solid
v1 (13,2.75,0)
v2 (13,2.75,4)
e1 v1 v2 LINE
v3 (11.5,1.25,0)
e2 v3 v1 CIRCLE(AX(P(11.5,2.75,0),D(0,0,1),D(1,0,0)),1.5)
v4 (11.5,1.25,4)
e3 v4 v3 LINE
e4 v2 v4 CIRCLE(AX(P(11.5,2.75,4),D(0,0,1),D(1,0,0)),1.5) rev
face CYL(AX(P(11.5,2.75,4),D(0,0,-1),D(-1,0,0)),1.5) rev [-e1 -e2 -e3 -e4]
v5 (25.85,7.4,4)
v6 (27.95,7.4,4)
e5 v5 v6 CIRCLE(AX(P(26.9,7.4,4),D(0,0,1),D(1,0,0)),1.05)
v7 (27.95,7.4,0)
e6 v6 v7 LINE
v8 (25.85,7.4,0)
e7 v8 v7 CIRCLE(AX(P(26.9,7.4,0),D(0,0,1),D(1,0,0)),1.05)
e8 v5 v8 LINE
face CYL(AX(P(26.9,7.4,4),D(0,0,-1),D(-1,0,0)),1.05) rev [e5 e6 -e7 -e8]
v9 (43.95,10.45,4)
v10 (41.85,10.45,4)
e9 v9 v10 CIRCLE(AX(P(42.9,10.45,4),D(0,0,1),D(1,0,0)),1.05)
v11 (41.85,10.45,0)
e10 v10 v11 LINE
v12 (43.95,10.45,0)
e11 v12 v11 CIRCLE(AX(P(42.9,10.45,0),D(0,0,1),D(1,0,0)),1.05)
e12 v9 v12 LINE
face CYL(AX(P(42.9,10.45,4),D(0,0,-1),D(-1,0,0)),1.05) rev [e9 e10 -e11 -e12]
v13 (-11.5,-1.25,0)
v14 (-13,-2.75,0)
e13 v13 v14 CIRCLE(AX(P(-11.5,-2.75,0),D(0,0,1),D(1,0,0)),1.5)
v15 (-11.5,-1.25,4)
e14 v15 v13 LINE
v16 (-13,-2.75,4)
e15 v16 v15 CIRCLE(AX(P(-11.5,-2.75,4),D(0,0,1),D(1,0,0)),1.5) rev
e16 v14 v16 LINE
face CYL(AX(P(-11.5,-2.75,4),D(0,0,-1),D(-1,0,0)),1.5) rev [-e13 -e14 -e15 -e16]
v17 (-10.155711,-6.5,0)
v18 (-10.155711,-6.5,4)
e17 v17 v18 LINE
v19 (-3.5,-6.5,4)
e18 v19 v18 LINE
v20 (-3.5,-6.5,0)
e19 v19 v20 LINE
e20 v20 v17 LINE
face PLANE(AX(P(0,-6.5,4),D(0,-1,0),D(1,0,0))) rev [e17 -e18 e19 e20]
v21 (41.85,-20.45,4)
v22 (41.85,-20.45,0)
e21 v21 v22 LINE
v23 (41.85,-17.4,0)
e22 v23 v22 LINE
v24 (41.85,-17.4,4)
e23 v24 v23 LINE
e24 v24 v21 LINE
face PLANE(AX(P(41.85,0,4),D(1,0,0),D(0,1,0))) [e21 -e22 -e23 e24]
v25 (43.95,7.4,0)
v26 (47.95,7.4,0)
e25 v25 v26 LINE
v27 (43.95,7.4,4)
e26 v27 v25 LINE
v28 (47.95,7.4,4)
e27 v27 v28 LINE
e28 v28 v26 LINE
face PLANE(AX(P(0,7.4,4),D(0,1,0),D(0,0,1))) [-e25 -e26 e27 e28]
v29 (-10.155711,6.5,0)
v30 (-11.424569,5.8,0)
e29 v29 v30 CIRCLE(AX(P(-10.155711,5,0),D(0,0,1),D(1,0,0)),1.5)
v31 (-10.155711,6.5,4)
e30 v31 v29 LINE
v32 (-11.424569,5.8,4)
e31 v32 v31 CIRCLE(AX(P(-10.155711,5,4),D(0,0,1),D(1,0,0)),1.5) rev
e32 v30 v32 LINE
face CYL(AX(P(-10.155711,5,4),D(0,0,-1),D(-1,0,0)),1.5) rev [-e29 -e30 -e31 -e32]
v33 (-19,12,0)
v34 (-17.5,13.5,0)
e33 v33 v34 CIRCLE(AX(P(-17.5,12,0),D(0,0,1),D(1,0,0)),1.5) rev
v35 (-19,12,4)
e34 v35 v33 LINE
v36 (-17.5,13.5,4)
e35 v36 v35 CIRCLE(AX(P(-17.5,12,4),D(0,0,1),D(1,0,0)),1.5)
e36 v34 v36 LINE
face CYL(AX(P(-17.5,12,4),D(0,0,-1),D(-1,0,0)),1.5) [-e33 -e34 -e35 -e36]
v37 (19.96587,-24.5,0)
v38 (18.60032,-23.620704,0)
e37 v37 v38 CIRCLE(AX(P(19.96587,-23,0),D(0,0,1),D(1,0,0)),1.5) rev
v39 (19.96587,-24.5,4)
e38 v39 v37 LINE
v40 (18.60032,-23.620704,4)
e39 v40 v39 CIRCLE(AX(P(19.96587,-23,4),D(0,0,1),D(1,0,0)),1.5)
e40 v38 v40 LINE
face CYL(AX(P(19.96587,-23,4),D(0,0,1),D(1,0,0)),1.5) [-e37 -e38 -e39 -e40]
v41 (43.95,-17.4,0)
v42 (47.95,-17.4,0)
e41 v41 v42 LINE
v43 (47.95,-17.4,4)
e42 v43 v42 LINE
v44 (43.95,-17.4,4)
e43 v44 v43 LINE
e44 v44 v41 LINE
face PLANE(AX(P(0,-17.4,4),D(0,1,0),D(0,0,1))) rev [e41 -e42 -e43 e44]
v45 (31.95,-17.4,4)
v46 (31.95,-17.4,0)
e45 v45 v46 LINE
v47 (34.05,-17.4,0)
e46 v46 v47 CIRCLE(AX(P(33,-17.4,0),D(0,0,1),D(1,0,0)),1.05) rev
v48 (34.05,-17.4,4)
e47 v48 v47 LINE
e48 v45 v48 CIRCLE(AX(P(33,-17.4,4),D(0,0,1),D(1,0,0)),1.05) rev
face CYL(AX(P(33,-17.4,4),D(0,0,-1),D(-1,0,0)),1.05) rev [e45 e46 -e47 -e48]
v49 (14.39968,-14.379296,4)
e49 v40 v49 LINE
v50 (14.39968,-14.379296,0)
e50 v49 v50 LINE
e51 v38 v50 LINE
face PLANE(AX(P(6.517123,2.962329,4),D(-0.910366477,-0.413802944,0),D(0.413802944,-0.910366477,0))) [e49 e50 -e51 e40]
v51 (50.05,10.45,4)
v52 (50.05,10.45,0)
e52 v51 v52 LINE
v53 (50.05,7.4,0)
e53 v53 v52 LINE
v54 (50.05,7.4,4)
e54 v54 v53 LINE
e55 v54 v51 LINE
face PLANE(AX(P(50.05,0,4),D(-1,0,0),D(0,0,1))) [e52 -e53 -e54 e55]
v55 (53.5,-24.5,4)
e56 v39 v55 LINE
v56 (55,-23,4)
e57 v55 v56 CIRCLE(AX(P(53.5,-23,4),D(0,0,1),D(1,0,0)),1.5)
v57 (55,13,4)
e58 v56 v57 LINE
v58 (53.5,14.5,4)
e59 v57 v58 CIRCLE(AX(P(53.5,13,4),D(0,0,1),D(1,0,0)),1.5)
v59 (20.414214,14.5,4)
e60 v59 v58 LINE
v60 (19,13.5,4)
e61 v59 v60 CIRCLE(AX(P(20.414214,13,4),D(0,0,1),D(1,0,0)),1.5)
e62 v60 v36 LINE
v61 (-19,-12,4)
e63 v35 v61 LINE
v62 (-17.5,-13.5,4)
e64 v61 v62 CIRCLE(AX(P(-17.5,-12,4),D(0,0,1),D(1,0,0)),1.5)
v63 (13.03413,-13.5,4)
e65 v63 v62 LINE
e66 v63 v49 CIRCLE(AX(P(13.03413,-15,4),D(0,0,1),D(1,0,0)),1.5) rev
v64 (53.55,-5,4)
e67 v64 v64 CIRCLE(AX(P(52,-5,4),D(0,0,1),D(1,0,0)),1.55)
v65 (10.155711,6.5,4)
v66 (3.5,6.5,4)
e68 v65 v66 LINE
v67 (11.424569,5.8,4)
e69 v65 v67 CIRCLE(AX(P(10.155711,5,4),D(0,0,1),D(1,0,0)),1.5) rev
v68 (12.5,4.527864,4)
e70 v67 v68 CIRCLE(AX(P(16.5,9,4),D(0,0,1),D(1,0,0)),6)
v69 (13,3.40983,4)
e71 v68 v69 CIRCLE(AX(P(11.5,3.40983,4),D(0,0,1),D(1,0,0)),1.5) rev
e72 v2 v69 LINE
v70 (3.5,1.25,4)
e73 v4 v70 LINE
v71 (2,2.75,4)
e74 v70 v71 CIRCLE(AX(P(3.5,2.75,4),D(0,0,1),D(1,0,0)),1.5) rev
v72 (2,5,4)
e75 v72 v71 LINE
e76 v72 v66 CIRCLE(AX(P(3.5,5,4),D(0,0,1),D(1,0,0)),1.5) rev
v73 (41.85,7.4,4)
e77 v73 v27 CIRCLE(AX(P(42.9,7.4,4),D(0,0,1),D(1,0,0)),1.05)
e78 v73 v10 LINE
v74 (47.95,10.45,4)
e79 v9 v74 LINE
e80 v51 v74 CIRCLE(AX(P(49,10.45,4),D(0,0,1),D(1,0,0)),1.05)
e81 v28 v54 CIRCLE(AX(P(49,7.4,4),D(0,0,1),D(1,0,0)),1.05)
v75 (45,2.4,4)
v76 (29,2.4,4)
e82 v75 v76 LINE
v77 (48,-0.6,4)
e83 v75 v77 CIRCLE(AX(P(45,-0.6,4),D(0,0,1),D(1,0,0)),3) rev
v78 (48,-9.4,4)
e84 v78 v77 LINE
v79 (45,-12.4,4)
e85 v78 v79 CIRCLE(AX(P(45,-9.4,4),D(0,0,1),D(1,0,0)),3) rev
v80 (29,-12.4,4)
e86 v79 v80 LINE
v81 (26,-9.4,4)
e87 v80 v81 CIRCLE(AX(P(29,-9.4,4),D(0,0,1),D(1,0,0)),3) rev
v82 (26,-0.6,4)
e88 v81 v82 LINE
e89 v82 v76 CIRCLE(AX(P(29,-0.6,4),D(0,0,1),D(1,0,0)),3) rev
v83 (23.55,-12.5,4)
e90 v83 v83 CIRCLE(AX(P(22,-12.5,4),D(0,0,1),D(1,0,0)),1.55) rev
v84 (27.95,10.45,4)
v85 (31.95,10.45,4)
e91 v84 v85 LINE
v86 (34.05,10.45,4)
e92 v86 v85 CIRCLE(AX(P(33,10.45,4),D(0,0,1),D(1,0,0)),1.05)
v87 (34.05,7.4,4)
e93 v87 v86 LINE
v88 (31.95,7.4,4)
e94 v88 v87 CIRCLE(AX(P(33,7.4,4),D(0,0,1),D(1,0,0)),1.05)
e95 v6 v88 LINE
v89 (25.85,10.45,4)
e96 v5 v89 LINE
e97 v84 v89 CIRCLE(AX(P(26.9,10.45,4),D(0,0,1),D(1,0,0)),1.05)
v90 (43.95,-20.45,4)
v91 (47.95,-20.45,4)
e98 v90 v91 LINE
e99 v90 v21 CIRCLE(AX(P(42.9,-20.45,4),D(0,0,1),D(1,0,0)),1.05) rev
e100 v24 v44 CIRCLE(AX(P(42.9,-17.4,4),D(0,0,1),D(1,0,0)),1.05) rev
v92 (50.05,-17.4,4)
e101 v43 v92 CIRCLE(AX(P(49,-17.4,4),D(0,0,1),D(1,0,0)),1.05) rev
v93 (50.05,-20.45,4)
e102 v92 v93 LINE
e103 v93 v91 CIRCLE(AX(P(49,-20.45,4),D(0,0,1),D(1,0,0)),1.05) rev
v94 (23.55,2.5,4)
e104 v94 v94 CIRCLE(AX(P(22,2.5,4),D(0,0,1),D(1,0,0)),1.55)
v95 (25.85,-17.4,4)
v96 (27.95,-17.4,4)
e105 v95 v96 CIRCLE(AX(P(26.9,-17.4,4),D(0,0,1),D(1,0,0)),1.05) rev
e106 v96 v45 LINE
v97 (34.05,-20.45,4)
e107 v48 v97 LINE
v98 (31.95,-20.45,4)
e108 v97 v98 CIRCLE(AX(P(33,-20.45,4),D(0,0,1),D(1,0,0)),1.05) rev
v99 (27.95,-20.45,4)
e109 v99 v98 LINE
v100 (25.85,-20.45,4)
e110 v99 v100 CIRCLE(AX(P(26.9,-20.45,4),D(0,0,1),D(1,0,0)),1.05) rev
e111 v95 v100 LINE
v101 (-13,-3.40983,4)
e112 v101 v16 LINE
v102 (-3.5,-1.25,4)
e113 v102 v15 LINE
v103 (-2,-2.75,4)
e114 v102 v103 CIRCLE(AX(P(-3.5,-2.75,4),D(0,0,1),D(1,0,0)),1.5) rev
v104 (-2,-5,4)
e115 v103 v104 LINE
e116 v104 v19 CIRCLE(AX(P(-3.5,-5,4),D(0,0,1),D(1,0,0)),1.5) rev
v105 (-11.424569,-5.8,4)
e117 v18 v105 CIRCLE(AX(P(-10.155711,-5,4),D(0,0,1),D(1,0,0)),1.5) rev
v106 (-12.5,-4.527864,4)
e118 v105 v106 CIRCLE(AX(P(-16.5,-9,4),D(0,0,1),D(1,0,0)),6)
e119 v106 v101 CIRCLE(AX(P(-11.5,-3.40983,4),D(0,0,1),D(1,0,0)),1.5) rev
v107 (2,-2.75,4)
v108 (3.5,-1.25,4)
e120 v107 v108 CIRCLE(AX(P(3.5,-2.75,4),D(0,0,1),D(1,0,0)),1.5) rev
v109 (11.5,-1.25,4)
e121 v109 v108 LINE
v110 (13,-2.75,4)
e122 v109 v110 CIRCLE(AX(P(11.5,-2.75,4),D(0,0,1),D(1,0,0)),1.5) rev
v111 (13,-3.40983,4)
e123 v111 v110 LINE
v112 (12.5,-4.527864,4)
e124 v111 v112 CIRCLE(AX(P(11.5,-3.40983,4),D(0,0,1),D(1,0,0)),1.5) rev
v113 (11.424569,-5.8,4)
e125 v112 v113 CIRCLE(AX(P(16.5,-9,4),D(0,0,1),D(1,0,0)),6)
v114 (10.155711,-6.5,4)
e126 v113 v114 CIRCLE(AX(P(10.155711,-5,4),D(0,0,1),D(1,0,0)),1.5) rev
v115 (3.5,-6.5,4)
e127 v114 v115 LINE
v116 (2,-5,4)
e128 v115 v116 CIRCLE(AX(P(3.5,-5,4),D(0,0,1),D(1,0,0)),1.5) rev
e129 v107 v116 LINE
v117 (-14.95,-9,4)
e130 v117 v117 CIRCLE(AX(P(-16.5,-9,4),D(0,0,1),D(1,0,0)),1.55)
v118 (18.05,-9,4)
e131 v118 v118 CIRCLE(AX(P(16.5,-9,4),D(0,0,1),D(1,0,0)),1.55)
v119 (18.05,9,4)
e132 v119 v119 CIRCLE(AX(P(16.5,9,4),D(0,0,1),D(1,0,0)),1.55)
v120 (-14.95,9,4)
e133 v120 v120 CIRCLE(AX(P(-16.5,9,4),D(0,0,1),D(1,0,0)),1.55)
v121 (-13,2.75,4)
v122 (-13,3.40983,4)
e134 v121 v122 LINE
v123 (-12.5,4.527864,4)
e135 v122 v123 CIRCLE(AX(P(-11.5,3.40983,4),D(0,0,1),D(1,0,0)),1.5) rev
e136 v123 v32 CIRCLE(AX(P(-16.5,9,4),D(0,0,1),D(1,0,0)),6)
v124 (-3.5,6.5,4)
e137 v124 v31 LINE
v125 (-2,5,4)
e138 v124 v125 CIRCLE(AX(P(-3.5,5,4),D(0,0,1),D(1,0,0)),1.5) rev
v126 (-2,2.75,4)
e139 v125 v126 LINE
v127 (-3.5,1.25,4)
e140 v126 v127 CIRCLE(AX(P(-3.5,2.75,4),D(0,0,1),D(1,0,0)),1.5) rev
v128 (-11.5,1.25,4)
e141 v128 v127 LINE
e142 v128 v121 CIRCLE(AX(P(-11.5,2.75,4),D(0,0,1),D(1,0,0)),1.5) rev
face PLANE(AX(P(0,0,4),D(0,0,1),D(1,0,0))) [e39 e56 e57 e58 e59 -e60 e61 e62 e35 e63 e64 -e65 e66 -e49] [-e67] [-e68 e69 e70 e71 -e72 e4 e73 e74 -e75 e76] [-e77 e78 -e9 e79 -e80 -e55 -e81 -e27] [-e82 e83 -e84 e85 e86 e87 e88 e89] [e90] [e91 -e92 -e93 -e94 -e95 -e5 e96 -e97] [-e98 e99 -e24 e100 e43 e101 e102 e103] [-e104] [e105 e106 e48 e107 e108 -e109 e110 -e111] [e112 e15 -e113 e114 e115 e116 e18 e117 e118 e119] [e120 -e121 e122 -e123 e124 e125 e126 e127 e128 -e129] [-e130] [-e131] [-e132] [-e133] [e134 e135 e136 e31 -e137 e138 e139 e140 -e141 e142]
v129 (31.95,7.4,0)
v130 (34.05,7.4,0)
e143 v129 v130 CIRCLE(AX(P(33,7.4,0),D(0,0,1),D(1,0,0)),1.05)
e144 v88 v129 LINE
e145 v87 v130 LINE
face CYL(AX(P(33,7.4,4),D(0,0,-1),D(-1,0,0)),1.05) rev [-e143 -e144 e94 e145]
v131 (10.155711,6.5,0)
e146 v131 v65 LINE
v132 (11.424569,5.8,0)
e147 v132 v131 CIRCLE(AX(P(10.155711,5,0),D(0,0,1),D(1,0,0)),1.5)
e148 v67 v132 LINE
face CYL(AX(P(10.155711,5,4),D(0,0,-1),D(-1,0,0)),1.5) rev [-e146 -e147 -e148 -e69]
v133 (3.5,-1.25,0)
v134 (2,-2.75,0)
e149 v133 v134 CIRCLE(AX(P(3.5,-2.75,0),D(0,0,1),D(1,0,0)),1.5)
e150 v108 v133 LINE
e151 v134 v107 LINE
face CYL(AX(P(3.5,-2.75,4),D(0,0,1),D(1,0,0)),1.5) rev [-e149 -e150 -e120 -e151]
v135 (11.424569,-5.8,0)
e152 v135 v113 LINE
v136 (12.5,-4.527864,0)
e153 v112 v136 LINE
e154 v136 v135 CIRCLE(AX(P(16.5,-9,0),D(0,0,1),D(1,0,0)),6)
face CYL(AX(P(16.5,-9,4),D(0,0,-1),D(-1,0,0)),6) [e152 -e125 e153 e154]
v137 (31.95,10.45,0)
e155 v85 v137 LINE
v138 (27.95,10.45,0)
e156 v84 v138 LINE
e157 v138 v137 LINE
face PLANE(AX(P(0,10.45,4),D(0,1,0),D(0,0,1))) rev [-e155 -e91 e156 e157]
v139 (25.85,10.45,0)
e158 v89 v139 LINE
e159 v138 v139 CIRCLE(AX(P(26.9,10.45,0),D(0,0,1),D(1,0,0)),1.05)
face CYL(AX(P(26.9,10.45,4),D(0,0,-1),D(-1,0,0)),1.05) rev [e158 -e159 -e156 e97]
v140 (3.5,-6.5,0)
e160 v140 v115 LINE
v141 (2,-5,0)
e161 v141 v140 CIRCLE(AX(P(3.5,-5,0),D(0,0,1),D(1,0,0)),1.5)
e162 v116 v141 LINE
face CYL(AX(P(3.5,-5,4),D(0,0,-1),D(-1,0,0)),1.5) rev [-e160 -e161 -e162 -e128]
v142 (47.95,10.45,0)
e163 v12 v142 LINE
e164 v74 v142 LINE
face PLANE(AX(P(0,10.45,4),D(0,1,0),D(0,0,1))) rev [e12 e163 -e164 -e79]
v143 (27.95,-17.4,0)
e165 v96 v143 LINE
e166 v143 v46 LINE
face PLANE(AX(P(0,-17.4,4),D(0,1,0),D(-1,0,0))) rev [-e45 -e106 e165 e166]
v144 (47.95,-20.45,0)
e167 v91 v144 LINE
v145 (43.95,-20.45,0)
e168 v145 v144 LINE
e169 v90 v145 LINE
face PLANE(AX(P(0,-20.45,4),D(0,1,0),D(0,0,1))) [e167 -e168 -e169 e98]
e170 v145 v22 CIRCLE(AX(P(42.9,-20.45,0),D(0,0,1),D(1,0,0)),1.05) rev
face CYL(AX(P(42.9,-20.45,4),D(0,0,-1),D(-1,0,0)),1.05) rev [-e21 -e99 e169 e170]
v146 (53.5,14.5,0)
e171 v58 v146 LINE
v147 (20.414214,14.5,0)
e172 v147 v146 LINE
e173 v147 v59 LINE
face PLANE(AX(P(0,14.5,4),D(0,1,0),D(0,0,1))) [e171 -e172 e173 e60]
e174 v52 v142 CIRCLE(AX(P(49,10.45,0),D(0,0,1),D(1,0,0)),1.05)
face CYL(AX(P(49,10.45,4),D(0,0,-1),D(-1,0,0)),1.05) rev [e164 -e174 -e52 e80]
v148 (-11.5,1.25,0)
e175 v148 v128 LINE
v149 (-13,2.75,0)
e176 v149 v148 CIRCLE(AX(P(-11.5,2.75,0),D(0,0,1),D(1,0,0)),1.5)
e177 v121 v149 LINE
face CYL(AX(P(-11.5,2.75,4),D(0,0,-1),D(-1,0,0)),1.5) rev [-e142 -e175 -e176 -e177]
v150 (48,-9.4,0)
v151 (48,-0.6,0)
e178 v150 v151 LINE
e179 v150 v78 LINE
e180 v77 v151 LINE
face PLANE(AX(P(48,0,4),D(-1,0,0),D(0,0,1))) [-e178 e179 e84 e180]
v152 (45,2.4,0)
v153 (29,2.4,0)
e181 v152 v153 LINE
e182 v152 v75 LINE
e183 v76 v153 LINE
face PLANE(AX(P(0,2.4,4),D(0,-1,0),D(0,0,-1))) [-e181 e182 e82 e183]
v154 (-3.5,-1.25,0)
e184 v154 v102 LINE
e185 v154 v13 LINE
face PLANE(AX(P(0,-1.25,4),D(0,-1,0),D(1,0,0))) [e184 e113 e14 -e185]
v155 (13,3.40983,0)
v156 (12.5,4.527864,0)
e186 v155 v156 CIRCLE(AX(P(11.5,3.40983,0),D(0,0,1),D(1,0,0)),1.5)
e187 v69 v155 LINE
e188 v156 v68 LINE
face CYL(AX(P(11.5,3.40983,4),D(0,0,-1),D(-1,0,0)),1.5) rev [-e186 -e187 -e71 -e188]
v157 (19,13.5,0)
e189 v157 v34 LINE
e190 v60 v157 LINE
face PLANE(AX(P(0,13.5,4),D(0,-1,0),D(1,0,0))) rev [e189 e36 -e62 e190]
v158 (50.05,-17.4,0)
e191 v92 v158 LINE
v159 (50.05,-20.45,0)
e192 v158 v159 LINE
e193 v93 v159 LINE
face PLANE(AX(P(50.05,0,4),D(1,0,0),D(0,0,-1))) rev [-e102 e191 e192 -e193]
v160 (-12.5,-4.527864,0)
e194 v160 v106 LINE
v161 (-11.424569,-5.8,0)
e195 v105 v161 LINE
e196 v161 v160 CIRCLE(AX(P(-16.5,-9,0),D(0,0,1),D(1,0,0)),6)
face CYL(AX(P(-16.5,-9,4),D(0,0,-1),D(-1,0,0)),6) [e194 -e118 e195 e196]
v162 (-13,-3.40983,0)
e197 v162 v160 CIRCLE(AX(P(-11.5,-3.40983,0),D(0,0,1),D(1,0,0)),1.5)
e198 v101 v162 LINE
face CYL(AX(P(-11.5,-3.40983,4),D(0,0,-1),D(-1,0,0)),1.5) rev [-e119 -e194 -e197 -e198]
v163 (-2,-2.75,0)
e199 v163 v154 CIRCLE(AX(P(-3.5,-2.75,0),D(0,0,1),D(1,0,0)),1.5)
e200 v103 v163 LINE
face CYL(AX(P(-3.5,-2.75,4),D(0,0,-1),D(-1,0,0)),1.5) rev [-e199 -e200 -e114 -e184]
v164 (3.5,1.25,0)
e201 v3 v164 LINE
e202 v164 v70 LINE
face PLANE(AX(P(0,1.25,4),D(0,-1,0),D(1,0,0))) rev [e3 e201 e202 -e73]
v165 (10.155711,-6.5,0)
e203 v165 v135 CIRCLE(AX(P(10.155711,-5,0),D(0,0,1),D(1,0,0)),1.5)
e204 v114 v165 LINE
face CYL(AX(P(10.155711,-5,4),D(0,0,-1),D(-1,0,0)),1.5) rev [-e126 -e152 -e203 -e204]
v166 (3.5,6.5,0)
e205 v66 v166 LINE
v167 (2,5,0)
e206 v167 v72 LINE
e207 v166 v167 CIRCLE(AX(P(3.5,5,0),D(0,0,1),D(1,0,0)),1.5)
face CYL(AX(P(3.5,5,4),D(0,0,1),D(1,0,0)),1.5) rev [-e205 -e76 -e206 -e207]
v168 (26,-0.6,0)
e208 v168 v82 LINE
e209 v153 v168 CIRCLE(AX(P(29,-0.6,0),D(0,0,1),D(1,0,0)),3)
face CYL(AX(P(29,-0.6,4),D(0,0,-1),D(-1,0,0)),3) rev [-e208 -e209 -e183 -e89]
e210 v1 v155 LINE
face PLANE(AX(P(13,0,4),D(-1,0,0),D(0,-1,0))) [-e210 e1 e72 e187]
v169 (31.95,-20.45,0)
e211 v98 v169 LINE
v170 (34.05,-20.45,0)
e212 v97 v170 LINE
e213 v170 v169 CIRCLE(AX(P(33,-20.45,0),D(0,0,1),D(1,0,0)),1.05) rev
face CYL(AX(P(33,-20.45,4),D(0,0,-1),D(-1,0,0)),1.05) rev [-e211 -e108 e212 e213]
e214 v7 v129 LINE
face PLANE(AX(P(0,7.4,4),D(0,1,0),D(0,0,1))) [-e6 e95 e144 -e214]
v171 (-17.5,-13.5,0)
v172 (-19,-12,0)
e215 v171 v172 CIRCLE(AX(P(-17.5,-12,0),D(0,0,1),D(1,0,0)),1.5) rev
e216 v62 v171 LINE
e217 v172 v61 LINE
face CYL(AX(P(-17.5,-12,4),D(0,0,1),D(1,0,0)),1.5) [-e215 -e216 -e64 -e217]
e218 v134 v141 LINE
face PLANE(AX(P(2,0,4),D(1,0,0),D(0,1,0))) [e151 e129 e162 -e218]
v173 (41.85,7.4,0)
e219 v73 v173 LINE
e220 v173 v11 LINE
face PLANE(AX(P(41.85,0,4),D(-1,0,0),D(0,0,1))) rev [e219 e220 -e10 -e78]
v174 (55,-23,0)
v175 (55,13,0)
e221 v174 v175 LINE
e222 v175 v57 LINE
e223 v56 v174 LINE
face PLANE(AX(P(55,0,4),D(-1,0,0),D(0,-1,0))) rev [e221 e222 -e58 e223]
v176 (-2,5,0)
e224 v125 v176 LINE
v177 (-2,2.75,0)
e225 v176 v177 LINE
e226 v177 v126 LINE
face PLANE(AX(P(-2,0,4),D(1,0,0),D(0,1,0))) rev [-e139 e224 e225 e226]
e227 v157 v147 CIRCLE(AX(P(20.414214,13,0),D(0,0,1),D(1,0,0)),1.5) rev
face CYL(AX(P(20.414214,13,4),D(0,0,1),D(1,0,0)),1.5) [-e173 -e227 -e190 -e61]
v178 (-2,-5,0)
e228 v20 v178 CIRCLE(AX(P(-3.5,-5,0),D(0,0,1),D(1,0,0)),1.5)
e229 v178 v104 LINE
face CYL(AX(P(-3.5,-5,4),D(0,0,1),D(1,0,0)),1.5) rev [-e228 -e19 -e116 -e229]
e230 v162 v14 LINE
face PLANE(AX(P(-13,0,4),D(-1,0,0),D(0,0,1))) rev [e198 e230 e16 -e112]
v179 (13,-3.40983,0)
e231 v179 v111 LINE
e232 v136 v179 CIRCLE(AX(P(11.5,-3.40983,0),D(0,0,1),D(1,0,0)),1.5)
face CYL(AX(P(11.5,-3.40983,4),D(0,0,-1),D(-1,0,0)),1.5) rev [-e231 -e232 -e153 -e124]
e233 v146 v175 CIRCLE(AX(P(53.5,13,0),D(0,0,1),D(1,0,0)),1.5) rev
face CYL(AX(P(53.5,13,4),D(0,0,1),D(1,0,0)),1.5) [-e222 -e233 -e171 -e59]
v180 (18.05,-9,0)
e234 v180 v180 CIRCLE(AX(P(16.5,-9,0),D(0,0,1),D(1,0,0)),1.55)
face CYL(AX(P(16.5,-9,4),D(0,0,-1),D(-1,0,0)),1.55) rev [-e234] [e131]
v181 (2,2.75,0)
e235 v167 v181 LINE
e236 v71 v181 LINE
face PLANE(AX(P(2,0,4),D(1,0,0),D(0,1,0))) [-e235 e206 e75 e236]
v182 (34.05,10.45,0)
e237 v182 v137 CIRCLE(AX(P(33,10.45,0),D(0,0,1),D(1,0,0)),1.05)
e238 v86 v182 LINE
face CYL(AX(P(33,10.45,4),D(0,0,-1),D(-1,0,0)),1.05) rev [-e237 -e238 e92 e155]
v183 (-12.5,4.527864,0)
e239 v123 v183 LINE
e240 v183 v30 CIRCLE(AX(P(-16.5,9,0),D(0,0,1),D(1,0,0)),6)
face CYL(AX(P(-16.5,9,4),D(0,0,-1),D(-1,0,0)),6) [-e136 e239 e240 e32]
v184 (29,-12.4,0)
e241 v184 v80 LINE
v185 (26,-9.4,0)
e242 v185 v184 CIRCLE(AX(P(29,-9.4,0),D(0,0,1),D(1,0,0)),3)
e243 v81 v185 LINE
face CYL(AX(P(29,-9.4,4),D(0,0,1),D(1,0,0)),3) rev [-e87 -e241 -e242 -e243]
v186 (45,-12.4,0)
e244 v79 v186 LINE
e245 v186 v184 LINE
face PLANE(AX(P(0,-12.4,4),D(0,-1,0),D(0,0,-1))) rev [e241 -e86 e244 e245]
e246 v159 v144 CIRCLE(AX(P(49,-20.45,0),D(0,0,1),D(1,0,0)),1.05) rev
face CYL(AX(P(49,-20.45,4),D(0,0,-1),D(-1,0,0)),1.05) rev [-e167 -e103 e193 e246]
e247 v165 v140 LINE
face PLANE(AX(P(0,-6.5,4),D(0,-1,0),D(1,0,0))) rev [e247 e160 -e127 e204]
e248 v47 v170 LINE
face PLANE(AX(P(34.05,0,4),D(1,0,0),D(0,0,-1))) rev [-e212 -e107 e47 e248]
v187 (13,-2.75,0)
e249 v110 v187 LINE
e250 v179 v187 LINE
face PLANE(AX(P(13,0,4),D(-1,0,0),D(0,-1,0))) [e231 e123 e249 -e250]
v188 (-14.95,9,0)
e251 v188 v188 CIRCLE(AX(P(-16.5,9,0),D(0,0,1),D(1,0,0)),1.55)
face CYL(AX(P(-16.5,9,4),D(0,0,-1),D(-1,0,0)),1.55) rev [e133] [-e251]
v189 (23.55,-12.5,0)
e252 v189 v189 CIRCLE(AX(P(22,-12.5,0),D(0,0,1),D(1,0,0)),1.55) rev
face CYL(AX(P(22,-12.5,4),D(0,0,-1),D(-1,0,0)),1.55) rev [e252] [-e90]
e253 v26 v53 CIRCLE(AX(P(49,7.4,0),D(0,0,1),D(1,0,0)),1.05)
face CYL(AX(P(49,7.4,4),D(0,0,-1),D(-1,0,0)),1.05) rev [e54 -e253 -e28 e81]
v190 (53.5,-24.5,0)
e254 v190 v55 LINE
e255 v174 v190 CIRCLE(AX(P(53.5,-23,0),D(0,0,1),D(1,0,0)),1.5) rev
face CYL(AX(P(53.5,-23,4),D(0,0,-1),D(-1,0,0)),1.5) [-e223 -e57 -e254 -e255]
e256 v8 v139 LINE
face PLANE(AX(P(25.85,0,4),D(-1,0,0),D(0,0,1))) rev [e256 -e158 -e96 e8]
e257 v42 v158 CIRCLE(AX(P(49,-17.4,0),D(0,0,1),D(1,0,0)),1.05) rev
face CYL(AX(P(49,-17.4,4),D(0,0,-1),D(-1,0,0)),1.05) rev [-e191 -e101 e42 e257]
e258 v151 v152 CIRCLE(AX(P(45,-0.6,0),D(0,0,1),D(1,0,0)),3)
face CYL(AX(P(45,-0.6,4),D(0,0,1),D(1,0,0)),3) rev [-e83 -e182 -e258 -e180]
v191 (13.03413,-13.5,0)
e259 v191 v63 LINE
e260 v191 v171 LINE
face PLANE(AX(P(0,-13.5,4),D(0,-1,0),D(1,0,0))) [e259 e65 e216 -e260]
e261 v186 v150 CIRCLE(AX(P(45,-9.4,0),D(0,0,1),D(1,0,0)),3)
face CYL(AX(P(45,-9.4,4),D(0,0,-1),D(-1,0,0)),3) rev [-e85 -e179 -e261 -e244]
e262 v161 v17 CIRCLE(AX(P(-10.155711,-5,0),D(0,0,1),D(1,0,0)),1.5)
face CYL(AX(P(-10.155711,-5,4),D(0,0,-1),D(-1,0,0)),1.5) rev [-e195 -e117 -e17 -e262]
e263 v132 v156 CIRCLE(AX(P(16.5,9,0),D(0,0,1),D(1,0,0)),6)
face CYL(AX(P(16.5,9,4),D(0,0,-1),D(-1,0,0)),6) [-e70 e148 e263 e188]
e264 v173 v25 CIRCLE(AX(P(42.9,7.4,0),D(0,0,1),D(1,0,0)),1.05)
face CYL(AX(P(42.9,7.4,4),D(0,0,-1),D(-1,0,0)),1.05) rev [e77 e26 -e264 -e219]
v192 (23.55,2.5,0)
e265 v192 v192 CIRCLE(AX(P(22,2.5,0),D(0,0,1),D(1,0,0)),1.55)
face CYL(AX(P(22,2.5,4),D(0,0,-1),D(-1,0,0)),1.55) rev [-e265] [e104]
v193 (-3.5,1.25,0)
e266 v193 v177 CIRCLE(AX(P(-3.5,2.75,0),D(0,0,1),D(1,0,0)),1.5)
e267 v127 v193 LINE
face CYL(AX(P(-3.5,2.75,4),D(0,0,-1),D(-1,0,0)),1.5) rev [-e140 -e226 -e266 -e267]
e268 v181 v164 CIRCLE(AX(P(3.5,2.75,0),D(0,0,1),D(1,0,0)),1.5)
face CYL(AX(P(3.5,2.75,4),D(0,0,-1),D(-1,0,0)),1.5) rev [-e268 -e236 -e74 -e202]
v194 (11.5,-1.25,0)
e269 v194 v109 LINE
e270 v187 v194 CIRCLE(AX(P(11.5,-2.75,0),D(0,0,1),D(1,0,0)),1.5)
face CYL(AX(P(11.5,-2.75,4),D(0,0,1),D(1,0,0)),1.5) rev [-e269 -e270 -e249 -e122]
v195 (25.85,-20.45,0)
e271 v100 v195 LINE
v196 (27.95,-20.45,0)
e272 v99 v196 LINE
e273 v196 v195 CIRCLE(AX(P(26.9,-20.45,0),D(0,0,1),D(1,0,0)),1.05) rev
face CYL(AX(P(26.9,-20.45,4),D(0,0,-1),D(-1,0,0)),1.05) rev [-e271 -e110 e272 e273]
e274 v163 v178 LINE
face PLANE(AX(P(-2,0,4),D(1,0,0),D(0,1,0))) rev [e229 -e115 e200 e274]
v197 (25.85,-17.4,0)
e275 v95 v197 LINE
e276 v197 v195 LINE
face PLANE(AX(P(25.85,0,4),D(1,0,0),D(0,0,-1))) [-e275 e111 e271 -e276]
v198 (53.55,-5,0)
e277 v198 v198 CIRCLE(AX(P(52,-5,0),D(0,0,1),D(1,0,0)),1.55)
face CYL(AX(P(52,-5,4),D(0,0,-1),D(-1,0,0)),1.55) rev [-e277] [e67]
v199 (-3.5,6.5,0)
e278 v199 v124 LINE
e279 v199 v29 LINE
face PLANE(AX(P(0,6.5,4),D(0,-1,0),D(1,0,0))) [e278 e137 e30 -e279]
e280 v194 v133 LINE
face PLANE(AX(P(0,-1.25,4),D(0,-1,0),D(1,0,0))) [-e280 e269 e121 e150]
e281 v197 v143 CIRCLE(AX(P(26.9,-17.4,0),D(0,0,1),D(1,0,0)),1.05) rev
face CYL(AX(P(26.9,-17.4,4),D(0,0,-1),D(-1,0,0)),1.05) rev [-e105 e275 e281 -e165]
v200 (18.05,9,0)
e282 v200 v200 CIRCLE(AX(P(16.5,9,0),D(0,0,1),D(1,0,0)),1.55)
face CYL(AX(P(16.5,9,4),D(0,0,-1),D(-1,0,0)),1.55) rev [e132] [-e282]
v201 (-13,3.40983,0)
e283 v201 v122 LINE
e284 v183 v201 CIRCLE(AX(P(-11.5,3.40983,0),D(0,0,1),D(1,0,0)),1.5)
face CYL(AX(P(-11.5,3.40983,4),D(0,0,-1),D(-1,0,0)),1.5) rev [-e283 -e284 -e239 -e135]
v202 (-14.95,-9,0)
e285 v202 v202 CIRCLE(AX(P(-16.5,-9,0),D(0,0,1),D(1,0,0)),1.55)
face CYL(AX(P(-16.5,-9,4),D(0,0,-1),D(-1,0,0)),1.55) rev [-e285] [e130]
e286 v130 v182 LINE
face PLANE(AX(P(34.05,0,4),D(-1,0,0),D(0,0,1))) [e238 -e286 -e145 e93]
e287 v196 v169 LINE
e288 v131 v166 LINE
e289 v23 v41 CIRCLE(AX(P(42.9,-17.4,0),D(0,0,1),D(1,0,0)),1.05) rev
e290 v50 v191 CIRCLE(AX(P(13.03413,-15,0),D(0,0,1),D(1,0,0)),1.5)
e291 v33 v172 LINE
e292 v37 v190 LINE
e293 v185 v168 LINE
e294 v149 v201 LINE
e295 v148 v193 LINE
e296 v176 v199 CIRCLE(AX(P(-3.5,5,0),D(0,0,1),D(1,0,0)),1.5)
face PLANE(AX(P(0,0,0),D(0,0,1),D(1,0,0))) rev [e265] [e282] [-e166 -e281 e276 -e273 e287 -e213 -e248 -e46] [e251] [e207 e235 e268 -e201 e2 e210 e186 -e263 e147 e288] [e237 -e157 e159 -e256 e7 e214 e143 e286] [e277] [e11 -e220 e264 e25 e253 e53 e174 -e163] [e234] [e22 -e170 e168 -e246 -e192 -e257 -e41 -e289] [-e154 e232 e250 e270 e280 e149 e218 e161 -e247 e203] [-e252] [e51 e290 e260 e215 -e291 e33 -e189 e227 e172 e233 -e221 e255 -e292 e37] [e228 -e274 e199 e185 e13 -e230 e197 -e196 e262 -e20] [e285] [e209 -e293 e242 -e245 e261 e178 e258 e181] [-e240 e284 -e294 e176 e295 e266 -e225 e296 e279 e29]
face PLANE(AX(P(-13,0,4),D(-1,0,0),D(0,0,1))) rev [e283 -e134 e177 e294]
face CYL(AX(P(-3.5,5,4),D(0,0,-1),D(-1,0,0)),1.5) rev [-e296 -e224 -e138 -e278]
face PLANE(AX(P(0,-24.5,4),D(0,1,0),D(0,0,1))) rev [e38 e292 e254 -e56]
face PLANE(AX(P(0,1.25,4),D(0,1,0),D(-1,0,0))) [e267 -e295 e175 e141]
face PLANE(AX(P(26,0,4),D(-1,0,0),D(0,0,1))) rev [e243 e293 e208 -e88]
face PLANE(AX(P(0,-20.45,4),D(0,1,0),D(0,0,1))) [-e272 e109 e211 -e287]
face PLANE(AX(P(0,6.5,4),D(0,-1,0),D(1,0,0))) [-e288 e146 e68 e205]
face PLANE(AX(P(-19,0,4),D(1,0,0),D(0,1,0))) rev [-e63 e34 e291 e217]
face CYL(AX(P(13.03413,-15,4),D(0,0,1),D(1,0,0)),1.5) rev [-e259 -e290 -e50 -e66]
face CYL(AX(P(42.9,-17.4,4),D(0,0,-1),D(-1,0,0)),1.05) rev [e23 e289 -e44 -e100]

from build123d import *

# Parameters (mm, degrees)
SKETCH_1_R      = 1.55
SKETCH_1_W      = 22
SKETCH_1_H      = 14.8
EXTRUDE_1_DEPTH = 4
FILLET_4_R      = 3
FILLET_2_R      = 1.5


with BuildPart() as part:
    # 草图1 → 凸台-拉伸1 (new body)
    with BuildSketch(Plane.XY):
        Polygon((19, 14.5), (19, 13.5), (-18, 13.5), (-19, 13.5), (-19, -13.5), (14, -13.5), (19, -24.5), (55, -24.5), (55, 14.5), align=None)
        with BuildLine():
            ThreePointArc((-18, -9.390512484), (-18.05, -9), (-18, -8.609487516))
            ThreePointArc((-18, -8.609487516), (-14.95, -9), (-18, -9.390512484))
        make_face(mode=Mode.SUBTRACT)
        with Locations((16.5, -9)):
            Circle(SKETCH_1_R, mode=Mode.SUBTRACT)
        with BuildLine():
            ThreePointArc((31.95, -17.4), (33, -16.35), (34.05, -17.4))
            Line((34.05, -17.4), (34.05, -20.45))
            ThreePointArc((34.05, -20.45), (33, -21.5), (31.95, -20.45))
            Line((31.95, -20.45), (27.95, -20.45))
            ThreePointArc((27.95, -20.45), (26.9, -21.5), (25.85, -20.45))
            Line((25.85, -20.45), (25.85, -17.4))
            ThreePointArc((25.85, -17.4), (26.9, -16.35), (27.95, -17.4))
            Line((27.95, -17.4), (31.95, -17.4))
        make_face(mode=Mode.SUBTRACT)
        with BuildLine():
            ThreePointArc((47.95, -17.4), (49, -16.35), (50.05, -17.4))
            Line((50.05, -17.4), (50.05, -20.45))
            ThreePointArc((50.05, -20.45), (49, -21.5), (47.95, -20.45))
            Line((47.95, -20.45), (43.95, -20.45))
            ThreePointArc((43.95, -20.45), (42.9, -21.5), (41.85, -20.45))
            Line((41.85, -20.45), (41.85, -17.4))
            ThreePointArc((41.85, -17.4), (42.9, -16.35), (43.95, -17.4))
            Line((43.95, -17.4), (47.95, -17.4))
        make_face(mode=Mode.SUBTRACT)
        with Locations((22, -12.5)):
            Circle(SKETCH_1_R, mode=Mode.SUBTRACT)
        with BuildLine():
            ThreePointArc((-11.045643943, -6.5), (-11.868221008, -5.185996413), (-13, -4.126602828))
            Line((-13, -4.126602828), (-13, -1.25))
            Line((-13, -1.25), (-2, -1.25))
            Line((-2, -1.25), (-2, -6.5))
            Line((-2, -6.5), (-11.045643943, -6.5))
        make_face(mode=Mode.SUBTRACT)
        with BuildLine():
            Line((-11.045643943, 6.5), (-2, 6.5))
            Line((-2, 6.5), (-2, 1.25))
            Line((-2, 1.25), (-13, 1.25))
            Line((-13, 1.25), (-13, 4.126602828))
            ThreePointArc((-13, 4.126602828), (-11.868221008, 5.185996413), (-11.045643943, 6.5))
        make_face(mode=Mode.SUBTRACT)
        with BuildLine():
            ThreePointArc((13, -4.126602828), (11.868221008, -5.185996413), (11.045643943, -6.5))
            Line((11.045643943, -6.5), (2, -6.5))
            Line((2, -6.5), (2, -1.25))
            Line((2, -1.25), (13, -1.25))
            Line((13, -1.25), (13, -4.126602828))
        make_face(mode=Mode.SUBTRACT)
        with BuildLine():
            Line((2, 6.5), (11.045643943, 6.5))
            ThreePointArc((11.045643943, 6.5), (11.868221008, 5.185996413), (13, 4.126602828))
            Line((13, 4.126602828), (13, 1.25))
            Line((13, 1.25), (2, 1.25))
            Line((2, 1.25), (2, 6.5))
        make_face(mode=Mode.SUBTRACT)
        with BuildLine():
            ThreePointArc((-18, 8.609487516), (-18.05, 9), (-18, 9.390512484))
            ThreePointArc((-18, 9.390512484), (-14.95, 9), (-18, 8.609487516))
        make_face(mode=Mode.SUBTRACT)
        with Locations((16.5, 9)):
            Circle(SKETCH_1_R, mode=Mode.SUBTRACT)
        with Locations((22, 2.5)):
            Circle(SKETCH_1_R, mode=Mode.SUBTRACT)
        with Locations((37, -5)):
            Rectangle(SKETCH_1_W, SKETCH_1_H, mode=Mode.SUBTRACT)
        with Locations((52, -5)):
            Circle(SKETCH_1_R, mode=Mode.SUBTRACT)
        with BuildLine():
            ThreePointArc((27.95, 7.4), (26.9, 6.35), (25.85, 7.4))
            Line((25.85, 7.4), (25.85, 10.45))
            ThreePointArc((25.85, 10.45), (26.9, 11.5), (27.95, 10.45))
            Line((27.95, 10.45), (31.95, 10.45))
            ThreePointArc((31.95, 10.45), (33, 11.5), (34.05, 10.45))
            Line((34.05, 10.45), (34.05, 7.4))
            ThreePointArc((34.05, 7.4), (33, 6.35), (31.95, 7.4))
            Line((31.95, 7.4), (27.95, 7.4))
        make_face(mode=Mode.SUBTRACT)
        with BuildLine():
            ThreePointArc((43.95, 7.4), (42.9, 6.35), (41.85, 7.4))
            Line((41.85, 7.4), (41.85, 10.45))
            ThreePointArc((41.85, 10.45), (42.9, 11.5), (43.95, 10.45))
            Line((43.95, 10.45), (47.95, 10.45))
            ThreePointArc((47.95, 10.45), (49, 11.5), (50.05, 10.45))
            Line((50.05, 10.45), (50.05, 7.4))
            ThreePointArc((50.05, 7.4), (49, 6.35), (47.95, 7.4))
            Line((47.95, 7.4), (43.95, 7.4))
        make_face(mode=Mode.SUBTRACT)
    extrude(amount=EXTRUDE_1_DEPTH)

    # 圆角4
    fillet_4_edges = [part.edges().sort_by_distance(p)[0] for p in [
        (48, -12.4, 2),
        (48, 2.4, 2),
        (26, 2.4, 2),
        (26, -12.4, 2),
    ]]
    fillet(fillet_4_edges, radius=FILLET_4_R)

    # 圆角2
    # the kernel refuses this fillet: 1.5 mm, written as the material it adds along each edge
    with BuildSketch(Plane(origin=(13, -4.126602828, 0), x_dir=(-0.7799082452950566, -0.6258938639424306, 0), z_dir=(0, 0, 1)), Plane(origin=(-13, 4.126602828, 0), x_dir=(0.7799082452950533, 0.6258938639424346, 0), z_dir=(0, 0, 1))) as fillet_2_piece_1:
        with BuildLine():
            CenterArc((0.721238689, -1.49785779), FILLET_2_R, 93.062490092, 48.189685104)
            Line((-0.448623679, -0.559016994), (0, 0))
            ThreePointArc((0, 0), (0.320550528, -0.008568839), (0.641101056, 0))
        make_face()
    extrude(amount=4)
    with BuildSketch(Plane(origin=(-2, 6.5, 0), x_dir=(-1, 0, 0), z_dir=(0, 0, 1)), Plane(origin=(2, 1.25, 0), x_dir=(1, 0, 0), z_dir=(0, 0, 1)), Plane(origin=(13, 1.25, 0), x_dir=(0, 1, 0), z_dir=(0, 0, 1)), Plane(origin=(13, -1.25, 0), x_dir=(-1, 0, 0), z_dir=(0, 0, 1)), Plane(origin=(2, -1.25, 0), x_dir=(0, -1, 0), z_dir=(0, 0, 1)), Plane(origin=(2, -6.5, 0), x_dir=(1, 0, 0), z_dir=(0, 0, 1)), Plane(origin=(-2, -6.5, 0), x_dir=(0, 1, 0), z_dir=(0, 0, 1)), Plane(origin=(-2, -1.25, 0), x_dir=(-1, 0, 0), z_dir=(0, 0, 1)), Plane(origin=(-13, -1.25, 0), x_dir=(0, -1, 0), z_dir=(0, 0, 1)), Plane(origin=(-13, 1.25, 0), x_dir=(1, 0, 0), z_dir=(0, 0, 1)), Plane(origin=(-2, 1.25, 0), x_dir=(0, 1, 0), z_dir=(0, 0, 1))) as fillet_2_piece_2:
        with BuildLine():
            CenterArc((FILLET_2_R, FILLET_2_R), FILLET_2_R, 180, 90)
            Line((0, FILLET_2_R), (0, 0))
            Line((0, 0), (FILLET_2_R, 0))
        make_face()
    extrude(amount=4)
    with BuildSketch(Plane(origin=(2, 6.5, 0), x_dir=(1, 0, 0), z_dir=(0, 0, 1))) as fillet_2_piece_3:
        with BuildLine():
            CenterArc((FILLET_2_R, -FILLET_2_R), FILLET_2_R, 90, 90)
            Line((0, -FILLET_2_R), (0, 0))
            Line((0, 0), (FILLET_2_R, 0))
        make_face()
    extrude(amount=4)
    with BuildSketch(Plane(origin=(-11.045643943, 6.5, 0), x_dir=(-0.47604843493949917, -0.8794190625587175, 0), z_dir=(0, 0, 1)), Plane(origin=(11.045643943, -6.5, 0), x_dir=(0.47604843493949517, 0.8794190625587197, 0), z_dir=(0, 0, 1))) as fillet_2_piece_4:
        with BuildLine():
            CenterArc((0.895477519, 1.496696445), FILLET_2_R, 208.427635494, 57.769047364)
            Line((-0.423651075, 0.782623792), (0, 0))
            ThreePointArc((0, 0), (0.397990008, 0.013214222), (0.795980017, 0))
        make_face()
    extrude(amount=4)
    with BuildSketch(Plane(origin=(-11.045643943, -6.5, 0), x_dir=(-0.4760484349394948, 0.8794190625587198, 0), z_dir=(0, 0, 1))) as fillet_2_piece_5:
        with BuildLine():
            CenterArc((0.895477519, -1.496696445), FILLET_2_R, 93.803317142, 57.769047364)
            Line((-0.423651075, -0.782623792), (0, 0))
            ThreePointArc((0, 0), (0.397990008, -0.013214222), (0.795980017, 0))
        make_face()
    extrude(amount=4)
    with BuildSketch(Plane(origin=(-13, -4.126602828, 0), x_dir=(0.7799082452950538, -0.6258938639424342, 0), z_dir=(0, 0, 1)), Plane(origin=(13, 4.126602828, 0), x_dir=(-0.779908245295054, 0.6258938639424338, 0), z_dir=(0, 0, 1))) as fillet_2_piece_6:
        with BuildLine():
            CenterArc((0.721238689, 1.49785779), FILLET_2_R, 218.747824804, 48.189685104)
            Line((-0.448623679, 0.559016994), (0, 0))
            ThreePointArc((0, 0), (0.320550528, 0.008568839), (0.641101056, 0))
        make_face()
    extrude(amount=4)
    with BuildSketch(Plane(origin=(14, -13.5, 0), x_dir=(-1, 0, 0), z_dir=(0, 0, 1))) as fillet_2_piece_7:
        with BuildLine():
            CenterArc((FILLET_2_R * 0.643913270327, FILLET_2_R), FILLET_2_R, 204.44395478, 65.55604522)
            Line((-FILLET_2_R * 0.266453207136, FILLET_2_R * 0.586197055699), (0, 0))
            Line((0, 0), (FILLET_2_R * 0.643913270327, 0))
        make_face()
    extrude(amount=4)
    with BuildSketch(Plane(origin=(11.045643943, 6.5, 0), x_dir=(-1, 0, 0), z_dir=(0, 0, 1))) as fillet_2_piece_8:
        with BuildLine():
            CenterArc((0.889932713, 1.5), FILLET_2_R, 212.230952636, 57.769047364)
            ThreePointArc((-0.378925041, 0.7), (-0.177841682, 0.35629061), (0, 0))
            Line((0, 0), (0.889932713, 0))
        make_face()
    extrude(amount=4)
    # the kernel refuses this fillet: 1.5 mm, written as the material it takes off along each edge
    with BuildSketch(Plane(origin=(55, -24.5, -3.75), x_dir=(-1, 0, 0), z_dir=(0, 0, 1)), Plane(origin=(-19, 13.5, -3.75), x_dir=(1, 0, 0), z_dir=(0, 0, 1)), Plane(origin=(-19, -13.5, -3.75), x_dir=(0, 1, 0), z_dir=(0, 0, 1))) as fillet_2_2_piece_1:
        with BuildLine():
            CenterArc((FILLET_2_R, -FILLET_2_R), FILLET_2_R, 90, 90)
            Line((0, -FILLET_2_R), (0, 0))
            Line((0, 0), (FILLET_2_R, 0))
        make_face()
    extrude(amount=11.5, mode=Mode.SUBTRACT)
    with BuildSketch(Plane(origin=(55, 14.5, -3.75), x_dir=(-1, 0, 0), z_dir=(0, 0, 1))) as fillet_2_2_piece_2:
        with BuildLine():
            CenterArc((FILLET_2_R, FILLET_2_R), FILLET_2_R, 180, 90)
            Line((0, FILLET_2_R), (0, 0))
            Line((0, 0), (FILLET_2_R, 0))
        make_face()
    extrude(amount=11.5, mode=Mode.SUBTRACT)
    with BuildSketch(Plane(origin=(19, 14.5, -3.535533906), x_dir=(1, 0, 0), z_dir=(0, 0, 1))) as fillet_2_2_piece_3:
        with BuildLine():
            CenterArc((1.414213562, -1.5), FILLET_2_R, 90, 70.528779366)
            Line((0, -1), (0, 0))
            Line((0, 0), (1.414213562, 0))
        make_face()
    extrude(amount=11.071067812, mode=Mode.SUBTRACT)
    with BuildSketch(Plane(origin=(19, -24.5, -2.414674764), x_dir=(-0.4138029443011837, 0.9103664774626049, 0), z_dir=(0, 0, 1))) as fillet_2_2_piece_4:
        with BuildLine():
            CenterArc((FILLET_2_R * 0.643913270327, -FILLET_2_R), FILLET_2_R, 90, 65.55604522)
            Line((-FILLET_2_R * 0.266453207136, -FILLET_2_R * 0.586197055699), (0, 0))
            Line((0, 0), (FILLET_2_R * 0.643913270327, 0))
        make_face()
    extrude(amount=8.829349527, mode=Mode.SUBTRACT)


solid = part.part
